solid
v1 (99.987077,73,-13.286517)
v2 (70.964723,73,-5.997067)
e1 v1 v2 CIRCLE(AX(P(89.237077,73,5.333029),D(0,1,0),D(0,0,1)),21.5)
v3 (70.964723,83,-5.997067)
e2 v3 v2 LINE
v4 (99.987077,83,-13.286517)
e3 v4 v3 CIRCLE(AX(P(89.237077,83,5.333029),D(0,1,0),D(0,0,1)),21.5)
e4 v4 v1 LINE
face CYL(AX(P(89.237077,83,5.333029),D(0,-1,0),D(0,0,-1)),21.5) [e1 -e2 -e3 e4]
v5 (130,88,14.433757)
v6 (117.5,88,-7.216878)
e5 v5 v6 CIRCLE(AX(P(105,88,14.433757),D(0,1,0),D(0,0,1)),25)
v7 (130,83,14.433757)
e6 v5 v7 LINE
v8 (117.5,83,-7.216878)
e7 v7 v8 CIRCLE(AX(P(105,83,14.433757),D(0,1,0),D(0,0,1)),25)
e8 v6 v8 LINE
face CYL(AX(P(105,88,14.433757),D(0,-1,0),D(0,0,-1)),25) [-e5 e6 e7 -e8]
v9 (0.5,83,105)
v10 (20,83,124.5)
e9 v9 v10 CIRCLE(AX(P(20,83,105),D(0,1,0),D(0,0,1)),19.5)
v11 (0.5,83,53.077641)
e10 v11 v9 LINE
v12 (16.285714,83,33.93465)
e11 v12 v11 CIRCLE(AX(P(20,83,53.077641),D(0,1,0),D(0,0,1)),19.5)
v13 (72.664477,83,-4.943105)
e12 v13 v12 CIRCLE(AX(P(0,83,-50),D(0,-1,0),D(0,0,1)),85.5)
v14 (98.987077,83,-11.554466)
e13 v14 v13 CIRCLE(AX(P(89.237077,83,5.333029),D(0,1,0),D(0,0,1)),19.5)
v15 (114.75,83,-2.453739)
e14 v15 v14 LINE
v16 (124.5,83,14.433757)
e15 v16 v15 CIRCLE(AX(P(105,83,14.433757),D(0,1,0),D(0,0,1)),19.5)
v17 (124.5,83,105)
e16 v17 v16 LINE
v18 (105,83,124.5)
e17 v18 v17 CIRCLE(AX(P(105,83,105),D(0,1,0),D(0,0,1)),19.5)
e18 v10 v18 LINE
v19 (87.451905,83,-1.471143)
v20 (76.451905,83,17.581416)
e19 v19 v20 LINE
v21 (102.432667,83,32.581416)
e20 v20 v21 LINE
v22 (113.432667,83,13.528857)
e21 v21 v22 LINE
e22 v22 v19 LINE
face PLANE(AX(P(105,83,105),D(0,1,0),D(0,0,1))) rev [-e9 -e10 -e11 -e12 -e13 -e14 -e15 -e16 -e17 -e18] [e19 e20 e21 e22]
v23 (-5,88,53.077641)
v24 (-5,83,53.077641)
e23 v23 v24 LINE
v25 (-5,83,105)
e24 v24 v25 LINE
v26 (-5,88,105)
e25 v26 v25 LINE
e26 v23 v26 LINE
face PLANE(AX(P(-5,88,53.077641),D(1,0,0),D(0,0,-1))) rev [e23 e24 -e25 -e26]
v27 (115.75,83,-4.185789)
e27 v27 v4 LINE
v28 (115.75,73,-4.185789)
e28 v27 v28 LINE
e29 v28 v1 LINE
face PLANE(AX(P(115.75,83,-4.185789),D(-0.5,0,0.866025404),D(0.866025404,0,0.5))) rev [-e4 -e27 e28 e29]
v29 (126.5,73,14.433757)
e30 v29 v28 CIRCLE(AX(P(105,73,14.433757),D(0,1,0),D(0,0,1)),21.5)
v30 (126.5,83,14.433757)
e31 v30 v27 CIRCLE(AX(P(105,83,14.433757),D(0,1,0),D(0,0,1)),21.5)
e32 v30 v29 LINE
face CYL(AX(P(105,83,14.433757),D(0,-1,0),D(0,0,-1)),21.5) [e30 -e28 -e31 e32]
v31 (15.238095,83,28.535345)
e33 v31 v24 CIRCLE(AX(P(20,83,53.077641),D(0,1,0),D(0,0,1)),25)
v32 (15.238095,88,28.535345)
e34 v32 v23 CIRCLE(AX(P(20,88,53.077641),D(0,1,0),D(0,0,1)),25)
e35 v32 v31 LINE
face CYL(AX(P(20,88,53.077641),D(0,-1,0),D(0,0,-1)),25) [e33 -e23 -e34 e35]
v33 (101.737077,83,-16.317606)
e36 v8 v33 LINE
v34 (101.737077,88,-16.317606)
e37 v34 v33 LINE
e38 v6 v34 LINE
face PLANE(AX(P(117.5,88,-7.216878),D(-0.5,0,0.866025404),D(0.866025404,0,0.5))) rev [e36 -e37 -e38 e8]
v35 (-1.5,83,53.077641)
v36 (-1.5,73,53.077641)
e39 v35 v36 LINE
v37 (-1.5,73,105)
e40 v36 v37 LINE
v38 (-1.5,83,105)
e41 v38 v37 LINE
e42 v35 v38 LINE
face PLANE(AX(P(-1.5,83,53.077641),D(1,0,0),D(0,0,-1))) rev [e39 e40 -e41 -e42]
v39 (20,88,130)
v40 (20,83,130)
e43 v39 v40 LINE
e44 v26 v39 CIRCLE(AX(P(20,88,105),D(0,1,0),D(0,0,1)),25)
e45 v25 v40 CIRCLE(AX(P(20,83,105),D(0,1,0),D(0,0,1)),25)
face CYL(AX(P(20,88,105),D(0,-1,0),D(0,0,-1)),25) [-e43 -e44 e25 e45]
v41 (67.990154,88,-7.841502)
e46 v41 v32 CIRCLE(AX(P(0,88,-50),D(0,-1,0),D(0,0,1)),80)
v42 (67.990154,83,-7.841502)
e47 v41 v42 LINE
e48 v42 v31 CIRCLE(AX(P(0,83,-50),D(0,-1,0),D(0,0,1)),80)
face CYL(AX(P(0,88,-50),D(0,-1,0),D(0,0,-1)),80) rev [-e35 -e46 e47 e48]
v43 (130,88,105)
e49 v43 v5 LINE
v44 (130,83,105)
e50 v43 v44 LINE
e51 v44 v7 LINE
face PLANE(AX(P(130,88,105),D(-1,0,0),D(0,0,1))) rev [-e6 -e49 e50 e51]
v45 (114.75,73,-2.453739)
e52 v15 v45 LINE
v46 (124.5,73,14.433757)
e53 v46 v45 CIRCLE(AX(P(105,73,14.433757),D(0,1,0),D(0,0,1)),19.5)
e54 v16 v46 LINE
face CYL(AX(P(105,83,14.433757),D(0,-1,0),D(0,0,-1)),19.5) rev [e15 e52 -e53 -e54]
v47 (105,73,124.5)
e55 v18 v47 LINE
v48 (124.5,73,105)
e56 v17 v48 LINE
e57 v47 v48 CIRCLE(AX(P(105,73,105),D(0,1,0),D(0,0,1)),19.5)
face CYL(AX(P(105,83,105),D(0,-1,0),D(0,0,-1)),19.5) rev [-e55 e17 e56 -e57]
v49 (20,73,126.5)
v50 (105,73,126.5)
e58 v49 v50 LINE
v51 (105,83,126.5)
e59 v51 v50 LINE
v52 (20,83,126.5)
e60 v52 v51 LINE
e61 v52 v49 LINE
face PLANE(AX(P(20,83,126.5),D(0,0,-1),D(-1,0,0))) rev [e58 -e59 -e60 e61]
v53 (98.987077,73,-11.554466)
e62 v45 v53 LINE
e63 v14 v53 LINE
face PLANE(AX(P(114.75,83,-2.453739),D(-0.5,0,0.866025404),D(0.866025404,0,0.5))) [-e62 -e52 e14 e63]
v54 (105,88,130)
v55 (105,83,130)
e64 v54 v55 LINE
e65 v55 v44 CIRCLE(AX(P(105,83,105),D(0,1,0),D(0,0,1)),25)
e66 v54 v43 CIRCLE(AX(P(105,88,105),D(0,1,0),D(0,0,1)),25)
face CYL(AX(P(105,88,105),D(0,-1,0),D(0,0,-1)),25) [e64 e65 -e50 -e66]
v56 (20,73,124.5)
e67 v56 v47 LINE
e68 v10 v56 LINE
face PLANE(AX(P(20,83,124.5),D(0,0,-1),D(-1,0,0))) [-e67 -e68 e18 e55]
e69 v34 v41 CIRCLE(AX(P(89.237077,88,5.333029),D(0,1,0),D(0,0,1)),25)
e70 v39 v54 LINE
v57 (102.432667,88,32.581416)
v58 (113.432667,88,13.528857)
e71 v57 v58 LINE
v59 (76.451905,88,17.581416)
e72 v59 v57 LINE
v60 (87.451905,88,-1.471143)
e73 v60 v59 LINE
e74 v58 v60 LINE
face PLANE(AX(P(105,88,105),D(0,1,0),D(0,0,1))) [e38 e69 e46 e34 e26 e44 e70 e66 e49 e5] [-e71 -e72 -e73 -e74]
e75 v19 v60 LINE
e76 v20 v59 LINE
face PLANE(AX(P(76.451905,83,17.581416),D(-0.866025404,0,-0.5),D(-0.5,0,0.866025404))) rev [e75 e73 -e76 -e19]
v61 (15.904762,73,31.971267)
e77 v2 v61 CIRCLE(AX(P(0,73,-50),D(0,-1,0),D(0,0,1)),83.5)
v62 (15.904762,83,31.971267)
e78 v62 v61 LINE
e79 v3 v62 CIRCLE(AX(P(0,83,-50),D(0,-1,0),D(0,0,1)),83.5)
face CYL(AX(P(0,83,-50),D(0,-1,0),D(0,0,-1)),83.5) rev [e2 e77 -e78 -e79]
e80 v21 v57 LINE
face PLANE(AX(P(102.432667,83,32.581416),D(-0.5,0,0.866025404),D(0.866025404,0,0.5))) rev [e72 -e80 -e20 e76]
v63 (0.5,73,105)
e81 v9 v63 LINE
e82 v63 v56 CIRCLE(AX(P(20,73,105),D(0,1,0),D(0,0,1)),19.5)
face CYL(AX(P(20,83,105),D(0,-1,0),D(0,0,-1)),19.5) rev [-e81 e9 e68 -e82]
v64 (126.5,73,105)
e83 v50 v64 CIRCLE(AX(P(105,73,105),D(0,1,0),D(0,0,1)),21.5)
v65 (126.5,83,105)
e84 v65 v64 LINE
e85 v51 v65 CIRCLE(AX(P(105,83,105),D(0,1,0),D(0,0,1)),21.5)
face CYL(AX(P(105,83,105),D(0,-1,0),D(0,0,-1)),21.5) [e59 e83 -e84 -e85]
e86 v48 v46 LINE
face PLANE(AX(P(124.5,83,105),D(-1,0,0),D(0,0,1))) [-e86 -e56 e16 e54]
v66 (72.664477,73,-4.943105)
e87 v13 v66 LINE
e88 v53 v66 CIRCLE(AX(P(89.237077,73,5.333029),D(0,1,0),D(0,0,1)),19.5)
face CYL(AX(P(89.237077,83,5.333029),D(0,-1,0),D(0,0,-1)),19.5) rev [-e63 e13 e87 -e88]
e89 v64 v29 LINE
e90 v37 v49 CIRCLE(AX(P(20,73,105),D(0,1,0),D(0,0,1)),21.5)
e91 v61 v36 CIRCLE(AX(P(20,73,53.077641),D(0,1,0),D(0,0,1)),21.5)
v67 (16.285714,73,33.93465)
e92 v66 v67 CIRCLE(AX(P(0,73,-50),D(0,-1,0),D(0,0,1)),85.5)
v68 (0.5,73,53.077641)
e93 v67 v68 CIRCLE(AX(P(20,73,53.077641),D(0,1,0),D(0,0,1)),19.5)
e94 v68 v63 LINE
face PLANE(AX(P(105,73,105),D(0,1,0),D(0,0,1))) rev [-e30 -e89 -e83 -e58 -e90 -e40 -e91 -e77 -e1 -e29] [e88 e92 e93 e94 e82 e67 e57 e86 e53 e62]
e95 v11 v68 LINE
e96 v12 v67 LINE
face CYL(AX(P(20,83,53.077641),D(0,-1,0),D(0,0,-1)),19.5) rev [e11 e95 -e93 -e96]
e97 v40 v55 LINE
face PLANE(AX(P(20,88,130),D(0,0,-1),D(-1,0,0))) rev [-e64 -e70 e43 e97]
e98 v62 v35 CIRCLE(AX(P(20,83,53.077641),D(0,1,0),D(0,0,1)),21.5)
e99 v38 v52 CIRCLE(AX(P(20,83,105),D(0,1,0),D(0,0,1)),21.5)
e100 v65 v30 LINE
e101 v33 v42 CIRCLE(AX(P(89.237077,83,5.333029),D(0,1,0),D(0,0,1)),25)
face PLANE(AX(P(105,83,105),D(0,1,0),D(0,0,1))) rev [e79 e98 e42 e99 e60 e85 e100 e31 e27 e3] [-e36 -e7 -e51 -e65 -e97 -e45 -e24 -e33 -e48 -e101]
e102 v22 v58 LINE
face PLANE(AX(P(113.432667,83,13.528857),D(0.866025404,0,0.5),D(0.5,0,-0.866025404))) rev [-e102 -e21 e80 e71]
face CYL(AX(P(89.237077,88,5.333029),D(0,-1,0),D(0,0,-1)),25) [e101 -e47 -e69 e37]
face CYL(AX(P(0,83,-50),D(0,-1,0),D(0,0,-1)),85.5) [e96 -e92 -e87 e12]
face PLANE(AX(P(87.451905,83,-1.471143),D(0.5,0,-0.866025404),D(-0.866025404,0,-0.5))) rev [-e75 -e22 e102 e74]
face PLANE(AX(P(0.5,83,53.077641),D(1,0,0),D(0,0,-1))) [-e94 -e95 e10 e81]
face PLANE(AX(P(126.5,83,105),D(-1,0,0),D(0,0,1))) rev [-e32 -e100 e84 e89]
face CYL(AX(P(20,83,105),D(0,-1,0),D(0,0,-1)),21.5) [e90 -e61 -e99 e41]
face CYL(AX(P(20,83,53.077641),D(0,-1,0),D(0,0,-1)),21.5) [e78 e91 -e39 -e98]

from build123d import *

# Parameters (mm, degrees)
SKETCH1_W               = 260
SKETCH1_H               = 100
BOSS_EXTRUDE1_DEPTH     = 3
CUT_EXTRUDE1_DEPTH      = 5
SKETCH5_W               = 260
SKETCH5_H               = 80
BOSS_EXTRUDE4_DEPTH     = 3
BOSS_EXTRUDE5_START     = 70
BOSS_EXTRUDE5_DEPTH     = 70
BOSS_EXTRUDE6_DEPTH     = 70
CUT_EXTRUDE3_DEPTH      = 198.810515393
SKETCH10_R              = 5
SKETCH10_R_2            = 1.75
BOSS_EXTRUDE7_DEPTH     = 50
CHAMFER1_SIZE           = 5
CHAMFER1_SIZE2          = 8.660254038
FILLET1_R               = 22
FILLET2_R               = 25
CUT_EXTRUDE4_START      = 20
CUT_EXTRUDE4_DEPTH      = 20
SKETCH12_R              = 1.75
CUT_EXTRUDE5_DEPTH      = 20
CUT_EXTRUDE6_DEPTH      = 40
FILLET3_R               = 5
BOSS_EXTRUDE8_DEPTH     = 10
CUT_EXTRUDE7_DEPTH      = 202.715145688
CUT_EXTRUDE7_DEPTH_BACK = 202.715145688
SKETCH16_W              = 135
SKETCH16_H              = 73
BOSS_EXTRUDE9_DEPTH     = 5
CUT_EXTRUDE8_DEPTH      = 5


with BuildPart() as part:
    # Sketch1 → Boss-Extrude1 (new body)
    with BuildSketch(Plane(origin=(0, 0, 0), x_dir=(1, 0, 0), z_dir=(0, 1, 0))):
        Rectangle(SKETCH1_W, SKETCH1_H)
    extrude(amount=BOSS_EXTRUDE1_DEPTH)

    # Sketch4 → Cut-Extrude1 (cut)
    with BuildSketch(Plane(origin=(0, 3, 0), x_dir=(1, 0, 0), z_dir=(0, 1, 0))):
        with BuildLine():
            Line((-77.534249575, 30.291115131), (-130, 0))
            Line((-130, 0), (-130, 50))
            Line((-130, 50), (130, 50))
            Line((130, 50), (130, 0))
            Line((130, 0), (77.534249575, 30.291115131))
            ThreePointArc((77.534249575, 30.291115131), (0, -30), (-77.534249575, 30.291115131))
        make_face()
    extrude(amount=-CUT_EXTRUDE1_DEPTH, mode=Mode.SUBTRACT)

    # Sketch5 → Boss-Extrude4 (add)
    with BuildSketch(Plane(origin=(0, 3, 0), x_dir=(1, 0, 0), z_dir=(0, 1, 0))):
        with Locations((0, -90)):
            Rectangle(SKETCH5_W, SKETCH5_H)
    extrude(amount=-BOSS_EXTRUDE4_DEPTH)

    # Sketch6 → Boss-Extrude5 (add)
    with BuildSketch(Plane(origin=(0, 3, 0), x_dir=(1, 0, 0), z_dir=(0, 1, 0)).offset(BOSS_EXTRUDE5_START)):
        with BuildLine():
            Line((-77.534249575, 30.291115131), (-130, 0))
            Line((-130, 0), (-130, -130))
            Line((-130, -130), (130, -130))
            Line((130, -130), (130, 0))
            Line((130, 0), (77.534249575, 30.291115131))
            ThreePointArc((77.534249575, 30.291115131), (0, -30), (-77.534249575, 30.291115131))
        make_face()
        with BuildLine():
            Line((-79.381629809, 25.76042804), (-127, -1.732050808))
            Line((-127, -1.732050808), (-127, -127))
            Line((-127, -127), (127, -127))
            Line((127, -127), (127, -1.732050808))
            Line((127, -1.732050808), (79.381629809, 25.76042804))
            ThreePointArc((79.381629809, 25.76042804), (0, -33), (-79.381629809, 25.76042804))
        make_face(mode=Mode.SUBTRACT)
    extrude(amount=-BOSS_EXTRUDE5_DEPTH)

    # Sketch7 → Boss-Extrude6 (add)
    with BuildSketch(Plane(origin=(0, 73, 0), x_dir=(1, 0, 0), z_dir=(0, 1, 0))):
        with BuildLine():
            Line((-5, -32.849260709), (-5, -130))
            Line((-5, -130), (-2, -130))
            Line((-2, -130), (-2, -32.975900116))
            ThreePointArc((-2, -32.975900116), (-3.500572722, -32.92614781), (-5, -32.849260709))
        make_face()
    extrude(amount=-BOSS_EXTRUDE6_DEPTH)

    # Sketch9 → Cut-Extrude3 (cut, through all)
    with BuildSketch(Plane(origin=(0, 73, 0), x_dir=(1, 0, 0), z_dir=(0, 1, 0))):
        Polygon((-5, -32.849260709), (-5, -144.876678539), (-379.728059333, -144.876678539), (-379.728059333, 52.069032857), (-5, 52.069032857), align=None)
    extrude(amount=-CUT_EXTRUDE3_DEPTH, mode=Mode.SUBTRACT)

    # Sketch10 → Boss-Extrude7 (add)
    # profile 1 of 4: a face of its own
    with BuildSketch(Plane(origin=(0, 3, 0), x_dir=(1, 0, 0), z_dir=(0, 1, 0))):
        with Locations(Location((14, -46.75, 0), (0, 0, 90))):
            Circle(SKETCH10_R)
        with Locations(Location((14, -46.75, 0), (0, 0, 270))):
            Circle(SKETCH10_R_2, mode=Mode.SUBTRACT)
    # profile 2 of 4: a face of its own
    with BuildSketch(Plane(origin=(0, 3, 0), x_dir=(1, 0, 0), z_dir=(0, 1, 0))):
        with Locations(Location((86, -46.75, 0), (0, 0, 90))):
            Circle(SKETCH10_R)
        with Locations(Location((86, -46.75, 0), (0, 0, 270))):
            Circle(SKETCH10_R_2, mode=Mode.SUBTRACT)
    # profile 3 of 4: a face of its own
    with BuildSketch(Plane(origin=(0, 3, 0), x_dir=(1, 0, 0), z_dir=(0, 1, 0))):
        with Locations(Location((86, -113.25, 0), (0, 0, 90))):
            Circle(SKETCH10_R)
        with Locations(Location((86, -113.25, 0), (0, 0, 270))):
            Circle(SKETCH10_R_2, mode=Mode.SUBTRACT)
    # profile 4 of 4: a face of its own
    with BuildSketch(Plane(origin=(0, 3, 0), x_dir=(1, 0, 0), z_dir=(0, 1, 0))):
        with Locations(Location((14, -113.25, 0), (0, 0, 90))):
            Circle(SKETCH10_R)
        with Locations(Location((14, -113.25, 0), (0, 0, 270))):
            Circle(SKETCH10_R_2, mode=Mode.SUBTRACT)
    extrude(amount=BOSS_EXTRUDE7_DEPTH)

    # Chamfer1
    chamfer1_edges = [part.edges().sort_by_distance(p)[0] for p in [
        (86, 3, 51.75),
        (14, 3, 51.75),
        (86, 3, 118.25),
        (14, 3, 118.25),
    ]]
    chamfer1_side = [part.faces().sort_by_distance(p)[0] for p in [
        (68.049806081, 3, 64.998636776),
    ]]
    chamfer(chamfer1_edges, length=CHAMFER1_SIZE, length2=CHAMFER1_SIZE2, reference=chamfer1_side[0])

    # Fillet1
    fillet1_edges = [part.edges().sort_by_distance(p)[0] for p in [
        (-2, 38, 127),
        (-2, 38, 32.975900116),
        (127, 38, 127),
        (127, 38, 1.732050808),
        (79.381629809, 38, -25.76042804),
    ]]
    fillet(fillet1_edges, radius=FILLET1_R)

    # Fillet2
    fillet2_edges = [part.edges().sort_by_distance(p)[0] for p in [
        (-5, 36.5, 29.843597113),
        (-5, 36.5, 130),
        (77.534249575, 36.5, -30.291115131),
        (130, 36.5, 0),
        (130, 36.5, 130),
    ]]
    fillet(fillet2_edges, radius=FILLET2_R)

    # Sketch11 → Cut-Extrude4 (cut)
    with BuildSketch(Plane(origin=(0, 3, 0), x_dir=(1, 0, 0), z_dir=(0, 1, 0)).offset(CUT_EXTRUDE4_START)):
        with BuildLine():
            Line((52.464250206, -10.394556462), (54.431659589, -12.65935233))
            ThreePointArc((54.431659589, -12.65935233), (36.359512028, -24.612236832), (15.80952381, -31.480420697))
            Line((15.80952381, -31.480420697), (15.238095238, -28.53534525))
            ThreePointArc((15.238095238, -28.53534525), (35.045312798, -21.915408995), (52.464250206, -10.394556462))
        make_face()
        Polygon((101.737077009, 16.317606197), (100.237077009, 13.719529986), (116, 4.618802154), (117.5, 7.216878365), align=None)
    extrude(amount=-CUT_EXTRUDE4_DEPTH, mode=Mode.SUBTRACT)

    # Sketch12 → Cut-Extrude5 (cut)
    with BuildSketch(Plane(origin=(0, 3, 0), x_dir=(1, 0, 0), z_dir=(0, 1, 0))):
        with Locations(Location((89.237077009, -5.333028897, 0), (0, 0, 270))):
            Circle(SKETCH12_R)
        with Locations(Location((105, -105, 0), (0, 0, 270))):
            Circle(SKETCH12_R)
        with Locations(Location((15, -105, 0), (0, 0, 66.494954424))):
            Circle(SKETCH12_R)
        with Locations(Location((15, -55, 0), (0, 0, 260.317408662))):
            Circle(SKETCH12_R)
    extrude(amount=-CUT_EXTRUDE5_DEPTH, mode=Mode.SUBTRACT)

    # Sketch14 → Cut-Extrude6 (cut)
    with BuildSketch(Plane.XZ.offset(-23)):
        Polygon((101.737077009, -16.317606197), (117.5, -7.216878365), (116, -4.618802154), (100.237077009, -13.719529986), align=None)
    extrude(amount=-CUT_EXTRUDE6_DEPTH, mode=Mode.SUBTRACT)

    # Fillet3
    # the kernel refuses this fillet: 5 mm, written as the material it adds along each edge
    with BuildSketch(Plane(origin=(101.737077009, 3, -16.317606197), x_dir=(0.8660254037844373, 0, 0.5000000000000024), z_dir=(-0.5000000000000026, 0, 0.8660254037844373))) as fillet3_piece_1_section:
        with BuildLine():
            CenterArc((FILLET3_R, FILLET3_R), FILLET3_R, 180, 90)
            Line((0, FILLET3_R), (0, 0))
            Line((0, 0), (FILLET3_R, 0))
        make_face()
    fillet3_piece_1 = extrude(amount=15.5, mode=Mode.PRIVATE)
    fillet3_piece_1 = fillet3_piece_1 - Plane(origin=(89.237077009, 3.433810283, 5.333028897), x_dir=(-0.8498769238912803, 0, -0.5269812275945843), z_dir=(0, -1, 0)) * Cylinder(22, 52, mode=Mode.PRIVATE)
    add(fillet3_piece_1)
    with BuildSketch(Plane(origin=(109.75, 3, 6.206515394), x_dir=(-0.8660254037844346, 0, -0.500000000000007), z_dir=(0.500000000000007, 0, -0.8660254037844346))) as fillet3_piece_2_section:
        with BuildLine():
            CenterArc((FILLET3_R, FILLET3_R), FILLET3_R, 180, 90)
            Line((0, FILLET3_R), (0, 0))
            Line((0, 0), (FILLET3_R, 0))
        make_face()
    fillet3_piece_2 = extrude(amount=15.5, mode=Mode.PRIVATE)
    fillet3_piece_2 = fillet3_piece_2 - Plane(origin=(105, 4.115508028, 14.43375673), x_dir=(0.5000000000000037, 0, -0.8660254037844366), z_dir=(0, -1, 0)) * Cylinder(22, 51, mode=Mode.PRIVATE)
    add(fillet3_piece_2)
    with BuildSketch(Plane(origin=(44.266711112, 3, 0.957907015), x_dir=(-0.754931955778907, 0, 0.6558031275800951), z_dir=(0.6558031275800951, 0, 0.754931955778907))) as fillet3_piece_3_section:
        with BuildLine():
            CenterArc((FILLET3_R, -FILLET3_R), FILLET3_R, 90, 90)
            Line((0, -FILLET3_R), (0, 0))
            Line((0, 0), (FILLET3_R, 0))
        make_face()
    fillet3_piece_3 = extrude(amount=28, mode=Mode.PRIVATE)
    fillet3_piece_3 = fillet3_piece_3 & Plane(origin=(0, 4.116736713, -50), x_dir=(0.9564051784275456, 0, 0.2920430356590872), z_dir=(0, 1, 0)) * Cylinder(83, 77, mode=Mode.PRIVATE)
    fillet3_piece_3 = fillet3_piece_3 - Plane(origin=(0, 4.116736713, -50), x_dir=(0.9691781196921706, 0, 0.2463610608638238), z_dir=(0, 1, 0)) * Cylinder(80, 77, mode=Mode.PRIVATE)
    add(fillet3_piece_3)
    with BuildSketch(Plane(origin=(18.19047619, 3, 43.751568392), x_dir=(0.9816918156232519, 0, -0.19047619047619338), z_dir=(-0.19047619047619338, 0, -0.981691815623252))) as fillet3_piece_4_section:
        with BuildLine():
            CenterArc((FILLET3_R, -FILLET3_R), FILLET3_R, 90, 90)
            Line((0, -FILLET3_R), (0, 0))
            Line((0, 0), (FILLET3_R, 0))
        make_face()
    fillet3_piece_4 = extrude(amount=28, mode=Mode.PRIVATE)
    fillet3_piece_4 = fillet3_piece_4 - Plane(origin=(20, 4.115502573, 53.07764064), x_dir=(-0.19047619047619013, 0, -0.9816918156232526), z_dir=(0, -1, 0)) * Cylinder(22, 77, mode=Mode.PRIVATE)
    fillet3_piece_4 = fillet3_piece_4 - Plane(origin=(0, 4.115502573, -50), x_dir=(0.9691781196921706, 0, 0.2463610608638238), z_dir=(0, 1, 0)) * Cylinder(80, 77, mode=Mode.PRIVATE)
    add(fillet3_piece_4)
    with BuildSketch(Plane(origin=(44.266711112, 23, 0.957907015), x_dir=(-0.754931955778907, 0, 0.6558031275800951), z_dir=(0.6558031275800951, 0, 0.754931955778907))) as fillet3_piece_5_section:
        with BuildLine():
            CenterArc((FILLET3_R, FILLET3_R), FILLET3_R, 180, 90)
            Line((0, FILLET3_R), (0, 0))
            Line((0, 0), (FILLET3_R, 0))
        make_face()
    fillet3_piece_5 = extrude(amount=28, mode=Mode.PRIVATE)
    fillet3_piece_5 = fillet3_piece_5 & Plane(origin=(0, 21.883263287, -50), x_dir=(0.9564051784275456, 0, 0.2920430356590872), z_dir=(0, 1, 0)) * Cylinder(83, 77, mode=Mode.PRIVATE)
    fillet3_piece_5 = fillet3_piece_5 - Plane(origin=(0, 21.883263287, -50), x_dir=(0.9691781196921706, 0, 0.2463610608638238), z_dir=(0, 1, 0)) * Cylinder(80, 77, mode=Mode.PRIVATE)
    add(fillet3_piece_5)
    with BuildSketch(Plane(origin=(18.19047619, 23, 43.751568392), x_dir=(0, -1, 0), z_dir=(-0.19047619047619338, 0, -0.981691815623252))) as fillet3_piece_6_section:
        with BuildLine():
            CenterArc((FILLET3_R, -FILLET3_R), FILLET3_R, 90, 90)
            Line((0, -FILLET3_R), (0, 0))
            Line((0, 0), (FILLET3_R, 0))
        make_face()
    fillet3_piece_6 = extrude(amount=28, mode=Mode.PRIVATE)
    fillet3_piece_6 = fillet3_piece_6 & Plane(origin=(0, 21.870297326, -50), x_dir=(0.9564051784275456, 0, 0.2920430356590872), z_dir=(0, 1, 0)) * Cylinder(83, 77, mode=Mode.PRIVATE)
    fillet3_piece_6 = fillet3_piece_6 - Plane(origin=(0, 21.870297326, -50), x_dir=(0.9691781196921706, 0, 0.2463610608638238), z_dir=(0, 1, 0)) * Cylinder(80, 77, mode=Mode.PRIVATE)
    add(fillet3_piece_6)
    with BuildSketch(Plane(origin=(100.237077009, 63, -13.719529986), x_dir=(0.866025403784437, 0, 0.5000000000000028), z_dir=(0.5000000000000028, 0, -0.866025403784437))) as fillet3_piece_7:
        with BuildLine():
            CenterArc((FILLET3_R, FILLET3_R), FILLET3_R, 180, 90)
            Line((0, FILLET3_R), (0, 0))
            Line((0, 0), (FILLET3_R, 0))
        make_face()
    extrude(amount=3)
    with BuildSketch(Plane(origin=(117.5, 63, -7.216878365), x_dir=(0, -1, 0), z_dir=(-0.500000000000007, 0, 0.8660254037844346))) as fillet3_piece_8:
        with BuildLine():
            CenterArc((FILLET3_R, -FILLET3_R), FILLET3_R, 90, 90)
            Line((0, -FILLET3_R), (0, 0))
            Line((0, 0), (FILLET3_R, 0))
        make_face()
    extrude(amount=3)

    # Sketch16 → Cut-Extrude7 (cut, two sides: drawn at the far end of the back side and taken through both)
    with BuildSketch(Plane.XY.offset(-CUT_EXTRUDE7_DEPTH_BACK)):
        with Locations((62.5, 36.5)):
            Rectangle(SKETCH16_W, SKETCH16_H)
    extrude(amount=CUT_EXTRUDE7_DEPTH + CUT_EXTRUDE7_DEPTH_BACK, mode=Mode.SUBTRACT)


with BuildPart() as body_2:
    # Sketch15 → Boss-Extrude8 (new body)
    with BuildSketch(Plane(origin=(0, 73, 0), x_dir=(1, 0, 0), z_dir=(0, 1, 0))):
        with BuildLine():
            Line((126.5, -105), (126.5, -14.43375673))
            ThreePointArc((126.5, -14.43375673), (123.619546181, -3.68375673), (115.75, 4.185789452))
            Line((115.75, 4.185789452), (99.987077009, 13.286517284))
            ThreePointArc((99.987077009, 13.286517284), (83.999666249, 15.519297796), (70.964723145, 5.997067496))
            ThreePointArc((70.964723145, 5.997067496), (47.402272696, -18.740632403), (15.904761905, -31.971266605))
            ThreePointArc((15.904761905, -31.971266605), (3.412389879, -39.399146919), (-1.5, -53.07764064))
            Line((-1.5, -53.07764064), (-1.5, -105))
            ThreePointArc((-1.5, -105), (4.797204204, -120.202795796), (20, -126.5))
            Line((20, -126.5), (105, -126.5))
            ThreePointArc((105, -126.5), (120.202795796, -120.202795796), (126.5, -105))
        make_face()
        with BuildLine():
            Line((124.5, -105), (124.5, -14.43375673))
            ThreePointArc((124.5, -14.43375673), (121.887495374, -4.68375673), (114.75, 2.453738644))
            Line((114.75, 2.453738644), (98.987077009, 11.554466476))
            ThreePointArc((98.987077009, 11.554466476), (84.48686725, 13.579546476), (72.664476993, 4.943105041))
            ThreePointArc((72.664476993, 4.943105041), (48.537656474, -20.387114617), (16.285714286, -33.934650236))
            ThreePointArc((16.285714286, -33.934650236), (4.955423379, -40.67156494), (0.5, -53.07764064))
            Line((0.5, -53.07764064), (0.5, -105))
            ThreePointArc((0.5, -105), (6.211417767, -118.788582233), (20, -124.5))
            Line((20, -124.5), (105, -124.5))
            ThreePointArc((105, -124.5), (118.788582233, -118.788582233), (124.5, -105))
        make_face(mode=Mode.SUBTRACT)
    extrude(amount=BOSS_EXTRUDE8_DEPTH)

    # Sketch17 → Boss-Extrude9 (add)
    with BuildSketch(Plane(origin=(0, 83, 0), x_dir=(1, 0, 0), z_dir=(0, 1, 0))):
        with BuildLine():
            Line((130, -105), (130, -14.43375673))
            ThreePointArc((130, -14.43375673), (126.650635095, -1.93375673), (117.5, 7.216878365))
            Line((117.5, 7.216878365), (101.737077009, 16.317606197))
            ThreePointArc((101.737077009, 16.317606197), (83.147064497, 18.913862607), (67.990153911, 7.841501792))
            ThreePointArc((67.990153911, 7.841501792), (45.415351086, -15.85928853), (15.238095238, -28.53534525))
            ThreePointArc((15.238095238, -28.53534525), (0.712081255, -37.172415383), (-5, -53.07764064))
            Line((-5, -53.07764064), (-5, -105))
            ThreePointArc((-5, -105), (2.32233047, -122.67766953), (20, -130))
            Line((20, -130), (105, -130))
            ThreePointArc((105, -130), (122.67766953, -122.67766953), (130, -105))
        make_face()
    extrude(amount=BOSS_EXTRUDE9_DEPTH)

    # Sketch18 → Cut-Extrude8 (cut)
    with BuildSketch(Plane(origin=(0, 88, 0), x_dir=(1, 0, 0), z_dir=(0, 1, 0))):
        Polygon((87.451905284, 1.47114317), (113.432667397, -13.52885683), (102.432667397, -32.581415713), (76.451905284, -17.581415713), align=None)
    extrude(amount=-CUT_EXTRUDE8_DEPTH, mode=Mode.SUBTRACT)


solid = body_2.part
